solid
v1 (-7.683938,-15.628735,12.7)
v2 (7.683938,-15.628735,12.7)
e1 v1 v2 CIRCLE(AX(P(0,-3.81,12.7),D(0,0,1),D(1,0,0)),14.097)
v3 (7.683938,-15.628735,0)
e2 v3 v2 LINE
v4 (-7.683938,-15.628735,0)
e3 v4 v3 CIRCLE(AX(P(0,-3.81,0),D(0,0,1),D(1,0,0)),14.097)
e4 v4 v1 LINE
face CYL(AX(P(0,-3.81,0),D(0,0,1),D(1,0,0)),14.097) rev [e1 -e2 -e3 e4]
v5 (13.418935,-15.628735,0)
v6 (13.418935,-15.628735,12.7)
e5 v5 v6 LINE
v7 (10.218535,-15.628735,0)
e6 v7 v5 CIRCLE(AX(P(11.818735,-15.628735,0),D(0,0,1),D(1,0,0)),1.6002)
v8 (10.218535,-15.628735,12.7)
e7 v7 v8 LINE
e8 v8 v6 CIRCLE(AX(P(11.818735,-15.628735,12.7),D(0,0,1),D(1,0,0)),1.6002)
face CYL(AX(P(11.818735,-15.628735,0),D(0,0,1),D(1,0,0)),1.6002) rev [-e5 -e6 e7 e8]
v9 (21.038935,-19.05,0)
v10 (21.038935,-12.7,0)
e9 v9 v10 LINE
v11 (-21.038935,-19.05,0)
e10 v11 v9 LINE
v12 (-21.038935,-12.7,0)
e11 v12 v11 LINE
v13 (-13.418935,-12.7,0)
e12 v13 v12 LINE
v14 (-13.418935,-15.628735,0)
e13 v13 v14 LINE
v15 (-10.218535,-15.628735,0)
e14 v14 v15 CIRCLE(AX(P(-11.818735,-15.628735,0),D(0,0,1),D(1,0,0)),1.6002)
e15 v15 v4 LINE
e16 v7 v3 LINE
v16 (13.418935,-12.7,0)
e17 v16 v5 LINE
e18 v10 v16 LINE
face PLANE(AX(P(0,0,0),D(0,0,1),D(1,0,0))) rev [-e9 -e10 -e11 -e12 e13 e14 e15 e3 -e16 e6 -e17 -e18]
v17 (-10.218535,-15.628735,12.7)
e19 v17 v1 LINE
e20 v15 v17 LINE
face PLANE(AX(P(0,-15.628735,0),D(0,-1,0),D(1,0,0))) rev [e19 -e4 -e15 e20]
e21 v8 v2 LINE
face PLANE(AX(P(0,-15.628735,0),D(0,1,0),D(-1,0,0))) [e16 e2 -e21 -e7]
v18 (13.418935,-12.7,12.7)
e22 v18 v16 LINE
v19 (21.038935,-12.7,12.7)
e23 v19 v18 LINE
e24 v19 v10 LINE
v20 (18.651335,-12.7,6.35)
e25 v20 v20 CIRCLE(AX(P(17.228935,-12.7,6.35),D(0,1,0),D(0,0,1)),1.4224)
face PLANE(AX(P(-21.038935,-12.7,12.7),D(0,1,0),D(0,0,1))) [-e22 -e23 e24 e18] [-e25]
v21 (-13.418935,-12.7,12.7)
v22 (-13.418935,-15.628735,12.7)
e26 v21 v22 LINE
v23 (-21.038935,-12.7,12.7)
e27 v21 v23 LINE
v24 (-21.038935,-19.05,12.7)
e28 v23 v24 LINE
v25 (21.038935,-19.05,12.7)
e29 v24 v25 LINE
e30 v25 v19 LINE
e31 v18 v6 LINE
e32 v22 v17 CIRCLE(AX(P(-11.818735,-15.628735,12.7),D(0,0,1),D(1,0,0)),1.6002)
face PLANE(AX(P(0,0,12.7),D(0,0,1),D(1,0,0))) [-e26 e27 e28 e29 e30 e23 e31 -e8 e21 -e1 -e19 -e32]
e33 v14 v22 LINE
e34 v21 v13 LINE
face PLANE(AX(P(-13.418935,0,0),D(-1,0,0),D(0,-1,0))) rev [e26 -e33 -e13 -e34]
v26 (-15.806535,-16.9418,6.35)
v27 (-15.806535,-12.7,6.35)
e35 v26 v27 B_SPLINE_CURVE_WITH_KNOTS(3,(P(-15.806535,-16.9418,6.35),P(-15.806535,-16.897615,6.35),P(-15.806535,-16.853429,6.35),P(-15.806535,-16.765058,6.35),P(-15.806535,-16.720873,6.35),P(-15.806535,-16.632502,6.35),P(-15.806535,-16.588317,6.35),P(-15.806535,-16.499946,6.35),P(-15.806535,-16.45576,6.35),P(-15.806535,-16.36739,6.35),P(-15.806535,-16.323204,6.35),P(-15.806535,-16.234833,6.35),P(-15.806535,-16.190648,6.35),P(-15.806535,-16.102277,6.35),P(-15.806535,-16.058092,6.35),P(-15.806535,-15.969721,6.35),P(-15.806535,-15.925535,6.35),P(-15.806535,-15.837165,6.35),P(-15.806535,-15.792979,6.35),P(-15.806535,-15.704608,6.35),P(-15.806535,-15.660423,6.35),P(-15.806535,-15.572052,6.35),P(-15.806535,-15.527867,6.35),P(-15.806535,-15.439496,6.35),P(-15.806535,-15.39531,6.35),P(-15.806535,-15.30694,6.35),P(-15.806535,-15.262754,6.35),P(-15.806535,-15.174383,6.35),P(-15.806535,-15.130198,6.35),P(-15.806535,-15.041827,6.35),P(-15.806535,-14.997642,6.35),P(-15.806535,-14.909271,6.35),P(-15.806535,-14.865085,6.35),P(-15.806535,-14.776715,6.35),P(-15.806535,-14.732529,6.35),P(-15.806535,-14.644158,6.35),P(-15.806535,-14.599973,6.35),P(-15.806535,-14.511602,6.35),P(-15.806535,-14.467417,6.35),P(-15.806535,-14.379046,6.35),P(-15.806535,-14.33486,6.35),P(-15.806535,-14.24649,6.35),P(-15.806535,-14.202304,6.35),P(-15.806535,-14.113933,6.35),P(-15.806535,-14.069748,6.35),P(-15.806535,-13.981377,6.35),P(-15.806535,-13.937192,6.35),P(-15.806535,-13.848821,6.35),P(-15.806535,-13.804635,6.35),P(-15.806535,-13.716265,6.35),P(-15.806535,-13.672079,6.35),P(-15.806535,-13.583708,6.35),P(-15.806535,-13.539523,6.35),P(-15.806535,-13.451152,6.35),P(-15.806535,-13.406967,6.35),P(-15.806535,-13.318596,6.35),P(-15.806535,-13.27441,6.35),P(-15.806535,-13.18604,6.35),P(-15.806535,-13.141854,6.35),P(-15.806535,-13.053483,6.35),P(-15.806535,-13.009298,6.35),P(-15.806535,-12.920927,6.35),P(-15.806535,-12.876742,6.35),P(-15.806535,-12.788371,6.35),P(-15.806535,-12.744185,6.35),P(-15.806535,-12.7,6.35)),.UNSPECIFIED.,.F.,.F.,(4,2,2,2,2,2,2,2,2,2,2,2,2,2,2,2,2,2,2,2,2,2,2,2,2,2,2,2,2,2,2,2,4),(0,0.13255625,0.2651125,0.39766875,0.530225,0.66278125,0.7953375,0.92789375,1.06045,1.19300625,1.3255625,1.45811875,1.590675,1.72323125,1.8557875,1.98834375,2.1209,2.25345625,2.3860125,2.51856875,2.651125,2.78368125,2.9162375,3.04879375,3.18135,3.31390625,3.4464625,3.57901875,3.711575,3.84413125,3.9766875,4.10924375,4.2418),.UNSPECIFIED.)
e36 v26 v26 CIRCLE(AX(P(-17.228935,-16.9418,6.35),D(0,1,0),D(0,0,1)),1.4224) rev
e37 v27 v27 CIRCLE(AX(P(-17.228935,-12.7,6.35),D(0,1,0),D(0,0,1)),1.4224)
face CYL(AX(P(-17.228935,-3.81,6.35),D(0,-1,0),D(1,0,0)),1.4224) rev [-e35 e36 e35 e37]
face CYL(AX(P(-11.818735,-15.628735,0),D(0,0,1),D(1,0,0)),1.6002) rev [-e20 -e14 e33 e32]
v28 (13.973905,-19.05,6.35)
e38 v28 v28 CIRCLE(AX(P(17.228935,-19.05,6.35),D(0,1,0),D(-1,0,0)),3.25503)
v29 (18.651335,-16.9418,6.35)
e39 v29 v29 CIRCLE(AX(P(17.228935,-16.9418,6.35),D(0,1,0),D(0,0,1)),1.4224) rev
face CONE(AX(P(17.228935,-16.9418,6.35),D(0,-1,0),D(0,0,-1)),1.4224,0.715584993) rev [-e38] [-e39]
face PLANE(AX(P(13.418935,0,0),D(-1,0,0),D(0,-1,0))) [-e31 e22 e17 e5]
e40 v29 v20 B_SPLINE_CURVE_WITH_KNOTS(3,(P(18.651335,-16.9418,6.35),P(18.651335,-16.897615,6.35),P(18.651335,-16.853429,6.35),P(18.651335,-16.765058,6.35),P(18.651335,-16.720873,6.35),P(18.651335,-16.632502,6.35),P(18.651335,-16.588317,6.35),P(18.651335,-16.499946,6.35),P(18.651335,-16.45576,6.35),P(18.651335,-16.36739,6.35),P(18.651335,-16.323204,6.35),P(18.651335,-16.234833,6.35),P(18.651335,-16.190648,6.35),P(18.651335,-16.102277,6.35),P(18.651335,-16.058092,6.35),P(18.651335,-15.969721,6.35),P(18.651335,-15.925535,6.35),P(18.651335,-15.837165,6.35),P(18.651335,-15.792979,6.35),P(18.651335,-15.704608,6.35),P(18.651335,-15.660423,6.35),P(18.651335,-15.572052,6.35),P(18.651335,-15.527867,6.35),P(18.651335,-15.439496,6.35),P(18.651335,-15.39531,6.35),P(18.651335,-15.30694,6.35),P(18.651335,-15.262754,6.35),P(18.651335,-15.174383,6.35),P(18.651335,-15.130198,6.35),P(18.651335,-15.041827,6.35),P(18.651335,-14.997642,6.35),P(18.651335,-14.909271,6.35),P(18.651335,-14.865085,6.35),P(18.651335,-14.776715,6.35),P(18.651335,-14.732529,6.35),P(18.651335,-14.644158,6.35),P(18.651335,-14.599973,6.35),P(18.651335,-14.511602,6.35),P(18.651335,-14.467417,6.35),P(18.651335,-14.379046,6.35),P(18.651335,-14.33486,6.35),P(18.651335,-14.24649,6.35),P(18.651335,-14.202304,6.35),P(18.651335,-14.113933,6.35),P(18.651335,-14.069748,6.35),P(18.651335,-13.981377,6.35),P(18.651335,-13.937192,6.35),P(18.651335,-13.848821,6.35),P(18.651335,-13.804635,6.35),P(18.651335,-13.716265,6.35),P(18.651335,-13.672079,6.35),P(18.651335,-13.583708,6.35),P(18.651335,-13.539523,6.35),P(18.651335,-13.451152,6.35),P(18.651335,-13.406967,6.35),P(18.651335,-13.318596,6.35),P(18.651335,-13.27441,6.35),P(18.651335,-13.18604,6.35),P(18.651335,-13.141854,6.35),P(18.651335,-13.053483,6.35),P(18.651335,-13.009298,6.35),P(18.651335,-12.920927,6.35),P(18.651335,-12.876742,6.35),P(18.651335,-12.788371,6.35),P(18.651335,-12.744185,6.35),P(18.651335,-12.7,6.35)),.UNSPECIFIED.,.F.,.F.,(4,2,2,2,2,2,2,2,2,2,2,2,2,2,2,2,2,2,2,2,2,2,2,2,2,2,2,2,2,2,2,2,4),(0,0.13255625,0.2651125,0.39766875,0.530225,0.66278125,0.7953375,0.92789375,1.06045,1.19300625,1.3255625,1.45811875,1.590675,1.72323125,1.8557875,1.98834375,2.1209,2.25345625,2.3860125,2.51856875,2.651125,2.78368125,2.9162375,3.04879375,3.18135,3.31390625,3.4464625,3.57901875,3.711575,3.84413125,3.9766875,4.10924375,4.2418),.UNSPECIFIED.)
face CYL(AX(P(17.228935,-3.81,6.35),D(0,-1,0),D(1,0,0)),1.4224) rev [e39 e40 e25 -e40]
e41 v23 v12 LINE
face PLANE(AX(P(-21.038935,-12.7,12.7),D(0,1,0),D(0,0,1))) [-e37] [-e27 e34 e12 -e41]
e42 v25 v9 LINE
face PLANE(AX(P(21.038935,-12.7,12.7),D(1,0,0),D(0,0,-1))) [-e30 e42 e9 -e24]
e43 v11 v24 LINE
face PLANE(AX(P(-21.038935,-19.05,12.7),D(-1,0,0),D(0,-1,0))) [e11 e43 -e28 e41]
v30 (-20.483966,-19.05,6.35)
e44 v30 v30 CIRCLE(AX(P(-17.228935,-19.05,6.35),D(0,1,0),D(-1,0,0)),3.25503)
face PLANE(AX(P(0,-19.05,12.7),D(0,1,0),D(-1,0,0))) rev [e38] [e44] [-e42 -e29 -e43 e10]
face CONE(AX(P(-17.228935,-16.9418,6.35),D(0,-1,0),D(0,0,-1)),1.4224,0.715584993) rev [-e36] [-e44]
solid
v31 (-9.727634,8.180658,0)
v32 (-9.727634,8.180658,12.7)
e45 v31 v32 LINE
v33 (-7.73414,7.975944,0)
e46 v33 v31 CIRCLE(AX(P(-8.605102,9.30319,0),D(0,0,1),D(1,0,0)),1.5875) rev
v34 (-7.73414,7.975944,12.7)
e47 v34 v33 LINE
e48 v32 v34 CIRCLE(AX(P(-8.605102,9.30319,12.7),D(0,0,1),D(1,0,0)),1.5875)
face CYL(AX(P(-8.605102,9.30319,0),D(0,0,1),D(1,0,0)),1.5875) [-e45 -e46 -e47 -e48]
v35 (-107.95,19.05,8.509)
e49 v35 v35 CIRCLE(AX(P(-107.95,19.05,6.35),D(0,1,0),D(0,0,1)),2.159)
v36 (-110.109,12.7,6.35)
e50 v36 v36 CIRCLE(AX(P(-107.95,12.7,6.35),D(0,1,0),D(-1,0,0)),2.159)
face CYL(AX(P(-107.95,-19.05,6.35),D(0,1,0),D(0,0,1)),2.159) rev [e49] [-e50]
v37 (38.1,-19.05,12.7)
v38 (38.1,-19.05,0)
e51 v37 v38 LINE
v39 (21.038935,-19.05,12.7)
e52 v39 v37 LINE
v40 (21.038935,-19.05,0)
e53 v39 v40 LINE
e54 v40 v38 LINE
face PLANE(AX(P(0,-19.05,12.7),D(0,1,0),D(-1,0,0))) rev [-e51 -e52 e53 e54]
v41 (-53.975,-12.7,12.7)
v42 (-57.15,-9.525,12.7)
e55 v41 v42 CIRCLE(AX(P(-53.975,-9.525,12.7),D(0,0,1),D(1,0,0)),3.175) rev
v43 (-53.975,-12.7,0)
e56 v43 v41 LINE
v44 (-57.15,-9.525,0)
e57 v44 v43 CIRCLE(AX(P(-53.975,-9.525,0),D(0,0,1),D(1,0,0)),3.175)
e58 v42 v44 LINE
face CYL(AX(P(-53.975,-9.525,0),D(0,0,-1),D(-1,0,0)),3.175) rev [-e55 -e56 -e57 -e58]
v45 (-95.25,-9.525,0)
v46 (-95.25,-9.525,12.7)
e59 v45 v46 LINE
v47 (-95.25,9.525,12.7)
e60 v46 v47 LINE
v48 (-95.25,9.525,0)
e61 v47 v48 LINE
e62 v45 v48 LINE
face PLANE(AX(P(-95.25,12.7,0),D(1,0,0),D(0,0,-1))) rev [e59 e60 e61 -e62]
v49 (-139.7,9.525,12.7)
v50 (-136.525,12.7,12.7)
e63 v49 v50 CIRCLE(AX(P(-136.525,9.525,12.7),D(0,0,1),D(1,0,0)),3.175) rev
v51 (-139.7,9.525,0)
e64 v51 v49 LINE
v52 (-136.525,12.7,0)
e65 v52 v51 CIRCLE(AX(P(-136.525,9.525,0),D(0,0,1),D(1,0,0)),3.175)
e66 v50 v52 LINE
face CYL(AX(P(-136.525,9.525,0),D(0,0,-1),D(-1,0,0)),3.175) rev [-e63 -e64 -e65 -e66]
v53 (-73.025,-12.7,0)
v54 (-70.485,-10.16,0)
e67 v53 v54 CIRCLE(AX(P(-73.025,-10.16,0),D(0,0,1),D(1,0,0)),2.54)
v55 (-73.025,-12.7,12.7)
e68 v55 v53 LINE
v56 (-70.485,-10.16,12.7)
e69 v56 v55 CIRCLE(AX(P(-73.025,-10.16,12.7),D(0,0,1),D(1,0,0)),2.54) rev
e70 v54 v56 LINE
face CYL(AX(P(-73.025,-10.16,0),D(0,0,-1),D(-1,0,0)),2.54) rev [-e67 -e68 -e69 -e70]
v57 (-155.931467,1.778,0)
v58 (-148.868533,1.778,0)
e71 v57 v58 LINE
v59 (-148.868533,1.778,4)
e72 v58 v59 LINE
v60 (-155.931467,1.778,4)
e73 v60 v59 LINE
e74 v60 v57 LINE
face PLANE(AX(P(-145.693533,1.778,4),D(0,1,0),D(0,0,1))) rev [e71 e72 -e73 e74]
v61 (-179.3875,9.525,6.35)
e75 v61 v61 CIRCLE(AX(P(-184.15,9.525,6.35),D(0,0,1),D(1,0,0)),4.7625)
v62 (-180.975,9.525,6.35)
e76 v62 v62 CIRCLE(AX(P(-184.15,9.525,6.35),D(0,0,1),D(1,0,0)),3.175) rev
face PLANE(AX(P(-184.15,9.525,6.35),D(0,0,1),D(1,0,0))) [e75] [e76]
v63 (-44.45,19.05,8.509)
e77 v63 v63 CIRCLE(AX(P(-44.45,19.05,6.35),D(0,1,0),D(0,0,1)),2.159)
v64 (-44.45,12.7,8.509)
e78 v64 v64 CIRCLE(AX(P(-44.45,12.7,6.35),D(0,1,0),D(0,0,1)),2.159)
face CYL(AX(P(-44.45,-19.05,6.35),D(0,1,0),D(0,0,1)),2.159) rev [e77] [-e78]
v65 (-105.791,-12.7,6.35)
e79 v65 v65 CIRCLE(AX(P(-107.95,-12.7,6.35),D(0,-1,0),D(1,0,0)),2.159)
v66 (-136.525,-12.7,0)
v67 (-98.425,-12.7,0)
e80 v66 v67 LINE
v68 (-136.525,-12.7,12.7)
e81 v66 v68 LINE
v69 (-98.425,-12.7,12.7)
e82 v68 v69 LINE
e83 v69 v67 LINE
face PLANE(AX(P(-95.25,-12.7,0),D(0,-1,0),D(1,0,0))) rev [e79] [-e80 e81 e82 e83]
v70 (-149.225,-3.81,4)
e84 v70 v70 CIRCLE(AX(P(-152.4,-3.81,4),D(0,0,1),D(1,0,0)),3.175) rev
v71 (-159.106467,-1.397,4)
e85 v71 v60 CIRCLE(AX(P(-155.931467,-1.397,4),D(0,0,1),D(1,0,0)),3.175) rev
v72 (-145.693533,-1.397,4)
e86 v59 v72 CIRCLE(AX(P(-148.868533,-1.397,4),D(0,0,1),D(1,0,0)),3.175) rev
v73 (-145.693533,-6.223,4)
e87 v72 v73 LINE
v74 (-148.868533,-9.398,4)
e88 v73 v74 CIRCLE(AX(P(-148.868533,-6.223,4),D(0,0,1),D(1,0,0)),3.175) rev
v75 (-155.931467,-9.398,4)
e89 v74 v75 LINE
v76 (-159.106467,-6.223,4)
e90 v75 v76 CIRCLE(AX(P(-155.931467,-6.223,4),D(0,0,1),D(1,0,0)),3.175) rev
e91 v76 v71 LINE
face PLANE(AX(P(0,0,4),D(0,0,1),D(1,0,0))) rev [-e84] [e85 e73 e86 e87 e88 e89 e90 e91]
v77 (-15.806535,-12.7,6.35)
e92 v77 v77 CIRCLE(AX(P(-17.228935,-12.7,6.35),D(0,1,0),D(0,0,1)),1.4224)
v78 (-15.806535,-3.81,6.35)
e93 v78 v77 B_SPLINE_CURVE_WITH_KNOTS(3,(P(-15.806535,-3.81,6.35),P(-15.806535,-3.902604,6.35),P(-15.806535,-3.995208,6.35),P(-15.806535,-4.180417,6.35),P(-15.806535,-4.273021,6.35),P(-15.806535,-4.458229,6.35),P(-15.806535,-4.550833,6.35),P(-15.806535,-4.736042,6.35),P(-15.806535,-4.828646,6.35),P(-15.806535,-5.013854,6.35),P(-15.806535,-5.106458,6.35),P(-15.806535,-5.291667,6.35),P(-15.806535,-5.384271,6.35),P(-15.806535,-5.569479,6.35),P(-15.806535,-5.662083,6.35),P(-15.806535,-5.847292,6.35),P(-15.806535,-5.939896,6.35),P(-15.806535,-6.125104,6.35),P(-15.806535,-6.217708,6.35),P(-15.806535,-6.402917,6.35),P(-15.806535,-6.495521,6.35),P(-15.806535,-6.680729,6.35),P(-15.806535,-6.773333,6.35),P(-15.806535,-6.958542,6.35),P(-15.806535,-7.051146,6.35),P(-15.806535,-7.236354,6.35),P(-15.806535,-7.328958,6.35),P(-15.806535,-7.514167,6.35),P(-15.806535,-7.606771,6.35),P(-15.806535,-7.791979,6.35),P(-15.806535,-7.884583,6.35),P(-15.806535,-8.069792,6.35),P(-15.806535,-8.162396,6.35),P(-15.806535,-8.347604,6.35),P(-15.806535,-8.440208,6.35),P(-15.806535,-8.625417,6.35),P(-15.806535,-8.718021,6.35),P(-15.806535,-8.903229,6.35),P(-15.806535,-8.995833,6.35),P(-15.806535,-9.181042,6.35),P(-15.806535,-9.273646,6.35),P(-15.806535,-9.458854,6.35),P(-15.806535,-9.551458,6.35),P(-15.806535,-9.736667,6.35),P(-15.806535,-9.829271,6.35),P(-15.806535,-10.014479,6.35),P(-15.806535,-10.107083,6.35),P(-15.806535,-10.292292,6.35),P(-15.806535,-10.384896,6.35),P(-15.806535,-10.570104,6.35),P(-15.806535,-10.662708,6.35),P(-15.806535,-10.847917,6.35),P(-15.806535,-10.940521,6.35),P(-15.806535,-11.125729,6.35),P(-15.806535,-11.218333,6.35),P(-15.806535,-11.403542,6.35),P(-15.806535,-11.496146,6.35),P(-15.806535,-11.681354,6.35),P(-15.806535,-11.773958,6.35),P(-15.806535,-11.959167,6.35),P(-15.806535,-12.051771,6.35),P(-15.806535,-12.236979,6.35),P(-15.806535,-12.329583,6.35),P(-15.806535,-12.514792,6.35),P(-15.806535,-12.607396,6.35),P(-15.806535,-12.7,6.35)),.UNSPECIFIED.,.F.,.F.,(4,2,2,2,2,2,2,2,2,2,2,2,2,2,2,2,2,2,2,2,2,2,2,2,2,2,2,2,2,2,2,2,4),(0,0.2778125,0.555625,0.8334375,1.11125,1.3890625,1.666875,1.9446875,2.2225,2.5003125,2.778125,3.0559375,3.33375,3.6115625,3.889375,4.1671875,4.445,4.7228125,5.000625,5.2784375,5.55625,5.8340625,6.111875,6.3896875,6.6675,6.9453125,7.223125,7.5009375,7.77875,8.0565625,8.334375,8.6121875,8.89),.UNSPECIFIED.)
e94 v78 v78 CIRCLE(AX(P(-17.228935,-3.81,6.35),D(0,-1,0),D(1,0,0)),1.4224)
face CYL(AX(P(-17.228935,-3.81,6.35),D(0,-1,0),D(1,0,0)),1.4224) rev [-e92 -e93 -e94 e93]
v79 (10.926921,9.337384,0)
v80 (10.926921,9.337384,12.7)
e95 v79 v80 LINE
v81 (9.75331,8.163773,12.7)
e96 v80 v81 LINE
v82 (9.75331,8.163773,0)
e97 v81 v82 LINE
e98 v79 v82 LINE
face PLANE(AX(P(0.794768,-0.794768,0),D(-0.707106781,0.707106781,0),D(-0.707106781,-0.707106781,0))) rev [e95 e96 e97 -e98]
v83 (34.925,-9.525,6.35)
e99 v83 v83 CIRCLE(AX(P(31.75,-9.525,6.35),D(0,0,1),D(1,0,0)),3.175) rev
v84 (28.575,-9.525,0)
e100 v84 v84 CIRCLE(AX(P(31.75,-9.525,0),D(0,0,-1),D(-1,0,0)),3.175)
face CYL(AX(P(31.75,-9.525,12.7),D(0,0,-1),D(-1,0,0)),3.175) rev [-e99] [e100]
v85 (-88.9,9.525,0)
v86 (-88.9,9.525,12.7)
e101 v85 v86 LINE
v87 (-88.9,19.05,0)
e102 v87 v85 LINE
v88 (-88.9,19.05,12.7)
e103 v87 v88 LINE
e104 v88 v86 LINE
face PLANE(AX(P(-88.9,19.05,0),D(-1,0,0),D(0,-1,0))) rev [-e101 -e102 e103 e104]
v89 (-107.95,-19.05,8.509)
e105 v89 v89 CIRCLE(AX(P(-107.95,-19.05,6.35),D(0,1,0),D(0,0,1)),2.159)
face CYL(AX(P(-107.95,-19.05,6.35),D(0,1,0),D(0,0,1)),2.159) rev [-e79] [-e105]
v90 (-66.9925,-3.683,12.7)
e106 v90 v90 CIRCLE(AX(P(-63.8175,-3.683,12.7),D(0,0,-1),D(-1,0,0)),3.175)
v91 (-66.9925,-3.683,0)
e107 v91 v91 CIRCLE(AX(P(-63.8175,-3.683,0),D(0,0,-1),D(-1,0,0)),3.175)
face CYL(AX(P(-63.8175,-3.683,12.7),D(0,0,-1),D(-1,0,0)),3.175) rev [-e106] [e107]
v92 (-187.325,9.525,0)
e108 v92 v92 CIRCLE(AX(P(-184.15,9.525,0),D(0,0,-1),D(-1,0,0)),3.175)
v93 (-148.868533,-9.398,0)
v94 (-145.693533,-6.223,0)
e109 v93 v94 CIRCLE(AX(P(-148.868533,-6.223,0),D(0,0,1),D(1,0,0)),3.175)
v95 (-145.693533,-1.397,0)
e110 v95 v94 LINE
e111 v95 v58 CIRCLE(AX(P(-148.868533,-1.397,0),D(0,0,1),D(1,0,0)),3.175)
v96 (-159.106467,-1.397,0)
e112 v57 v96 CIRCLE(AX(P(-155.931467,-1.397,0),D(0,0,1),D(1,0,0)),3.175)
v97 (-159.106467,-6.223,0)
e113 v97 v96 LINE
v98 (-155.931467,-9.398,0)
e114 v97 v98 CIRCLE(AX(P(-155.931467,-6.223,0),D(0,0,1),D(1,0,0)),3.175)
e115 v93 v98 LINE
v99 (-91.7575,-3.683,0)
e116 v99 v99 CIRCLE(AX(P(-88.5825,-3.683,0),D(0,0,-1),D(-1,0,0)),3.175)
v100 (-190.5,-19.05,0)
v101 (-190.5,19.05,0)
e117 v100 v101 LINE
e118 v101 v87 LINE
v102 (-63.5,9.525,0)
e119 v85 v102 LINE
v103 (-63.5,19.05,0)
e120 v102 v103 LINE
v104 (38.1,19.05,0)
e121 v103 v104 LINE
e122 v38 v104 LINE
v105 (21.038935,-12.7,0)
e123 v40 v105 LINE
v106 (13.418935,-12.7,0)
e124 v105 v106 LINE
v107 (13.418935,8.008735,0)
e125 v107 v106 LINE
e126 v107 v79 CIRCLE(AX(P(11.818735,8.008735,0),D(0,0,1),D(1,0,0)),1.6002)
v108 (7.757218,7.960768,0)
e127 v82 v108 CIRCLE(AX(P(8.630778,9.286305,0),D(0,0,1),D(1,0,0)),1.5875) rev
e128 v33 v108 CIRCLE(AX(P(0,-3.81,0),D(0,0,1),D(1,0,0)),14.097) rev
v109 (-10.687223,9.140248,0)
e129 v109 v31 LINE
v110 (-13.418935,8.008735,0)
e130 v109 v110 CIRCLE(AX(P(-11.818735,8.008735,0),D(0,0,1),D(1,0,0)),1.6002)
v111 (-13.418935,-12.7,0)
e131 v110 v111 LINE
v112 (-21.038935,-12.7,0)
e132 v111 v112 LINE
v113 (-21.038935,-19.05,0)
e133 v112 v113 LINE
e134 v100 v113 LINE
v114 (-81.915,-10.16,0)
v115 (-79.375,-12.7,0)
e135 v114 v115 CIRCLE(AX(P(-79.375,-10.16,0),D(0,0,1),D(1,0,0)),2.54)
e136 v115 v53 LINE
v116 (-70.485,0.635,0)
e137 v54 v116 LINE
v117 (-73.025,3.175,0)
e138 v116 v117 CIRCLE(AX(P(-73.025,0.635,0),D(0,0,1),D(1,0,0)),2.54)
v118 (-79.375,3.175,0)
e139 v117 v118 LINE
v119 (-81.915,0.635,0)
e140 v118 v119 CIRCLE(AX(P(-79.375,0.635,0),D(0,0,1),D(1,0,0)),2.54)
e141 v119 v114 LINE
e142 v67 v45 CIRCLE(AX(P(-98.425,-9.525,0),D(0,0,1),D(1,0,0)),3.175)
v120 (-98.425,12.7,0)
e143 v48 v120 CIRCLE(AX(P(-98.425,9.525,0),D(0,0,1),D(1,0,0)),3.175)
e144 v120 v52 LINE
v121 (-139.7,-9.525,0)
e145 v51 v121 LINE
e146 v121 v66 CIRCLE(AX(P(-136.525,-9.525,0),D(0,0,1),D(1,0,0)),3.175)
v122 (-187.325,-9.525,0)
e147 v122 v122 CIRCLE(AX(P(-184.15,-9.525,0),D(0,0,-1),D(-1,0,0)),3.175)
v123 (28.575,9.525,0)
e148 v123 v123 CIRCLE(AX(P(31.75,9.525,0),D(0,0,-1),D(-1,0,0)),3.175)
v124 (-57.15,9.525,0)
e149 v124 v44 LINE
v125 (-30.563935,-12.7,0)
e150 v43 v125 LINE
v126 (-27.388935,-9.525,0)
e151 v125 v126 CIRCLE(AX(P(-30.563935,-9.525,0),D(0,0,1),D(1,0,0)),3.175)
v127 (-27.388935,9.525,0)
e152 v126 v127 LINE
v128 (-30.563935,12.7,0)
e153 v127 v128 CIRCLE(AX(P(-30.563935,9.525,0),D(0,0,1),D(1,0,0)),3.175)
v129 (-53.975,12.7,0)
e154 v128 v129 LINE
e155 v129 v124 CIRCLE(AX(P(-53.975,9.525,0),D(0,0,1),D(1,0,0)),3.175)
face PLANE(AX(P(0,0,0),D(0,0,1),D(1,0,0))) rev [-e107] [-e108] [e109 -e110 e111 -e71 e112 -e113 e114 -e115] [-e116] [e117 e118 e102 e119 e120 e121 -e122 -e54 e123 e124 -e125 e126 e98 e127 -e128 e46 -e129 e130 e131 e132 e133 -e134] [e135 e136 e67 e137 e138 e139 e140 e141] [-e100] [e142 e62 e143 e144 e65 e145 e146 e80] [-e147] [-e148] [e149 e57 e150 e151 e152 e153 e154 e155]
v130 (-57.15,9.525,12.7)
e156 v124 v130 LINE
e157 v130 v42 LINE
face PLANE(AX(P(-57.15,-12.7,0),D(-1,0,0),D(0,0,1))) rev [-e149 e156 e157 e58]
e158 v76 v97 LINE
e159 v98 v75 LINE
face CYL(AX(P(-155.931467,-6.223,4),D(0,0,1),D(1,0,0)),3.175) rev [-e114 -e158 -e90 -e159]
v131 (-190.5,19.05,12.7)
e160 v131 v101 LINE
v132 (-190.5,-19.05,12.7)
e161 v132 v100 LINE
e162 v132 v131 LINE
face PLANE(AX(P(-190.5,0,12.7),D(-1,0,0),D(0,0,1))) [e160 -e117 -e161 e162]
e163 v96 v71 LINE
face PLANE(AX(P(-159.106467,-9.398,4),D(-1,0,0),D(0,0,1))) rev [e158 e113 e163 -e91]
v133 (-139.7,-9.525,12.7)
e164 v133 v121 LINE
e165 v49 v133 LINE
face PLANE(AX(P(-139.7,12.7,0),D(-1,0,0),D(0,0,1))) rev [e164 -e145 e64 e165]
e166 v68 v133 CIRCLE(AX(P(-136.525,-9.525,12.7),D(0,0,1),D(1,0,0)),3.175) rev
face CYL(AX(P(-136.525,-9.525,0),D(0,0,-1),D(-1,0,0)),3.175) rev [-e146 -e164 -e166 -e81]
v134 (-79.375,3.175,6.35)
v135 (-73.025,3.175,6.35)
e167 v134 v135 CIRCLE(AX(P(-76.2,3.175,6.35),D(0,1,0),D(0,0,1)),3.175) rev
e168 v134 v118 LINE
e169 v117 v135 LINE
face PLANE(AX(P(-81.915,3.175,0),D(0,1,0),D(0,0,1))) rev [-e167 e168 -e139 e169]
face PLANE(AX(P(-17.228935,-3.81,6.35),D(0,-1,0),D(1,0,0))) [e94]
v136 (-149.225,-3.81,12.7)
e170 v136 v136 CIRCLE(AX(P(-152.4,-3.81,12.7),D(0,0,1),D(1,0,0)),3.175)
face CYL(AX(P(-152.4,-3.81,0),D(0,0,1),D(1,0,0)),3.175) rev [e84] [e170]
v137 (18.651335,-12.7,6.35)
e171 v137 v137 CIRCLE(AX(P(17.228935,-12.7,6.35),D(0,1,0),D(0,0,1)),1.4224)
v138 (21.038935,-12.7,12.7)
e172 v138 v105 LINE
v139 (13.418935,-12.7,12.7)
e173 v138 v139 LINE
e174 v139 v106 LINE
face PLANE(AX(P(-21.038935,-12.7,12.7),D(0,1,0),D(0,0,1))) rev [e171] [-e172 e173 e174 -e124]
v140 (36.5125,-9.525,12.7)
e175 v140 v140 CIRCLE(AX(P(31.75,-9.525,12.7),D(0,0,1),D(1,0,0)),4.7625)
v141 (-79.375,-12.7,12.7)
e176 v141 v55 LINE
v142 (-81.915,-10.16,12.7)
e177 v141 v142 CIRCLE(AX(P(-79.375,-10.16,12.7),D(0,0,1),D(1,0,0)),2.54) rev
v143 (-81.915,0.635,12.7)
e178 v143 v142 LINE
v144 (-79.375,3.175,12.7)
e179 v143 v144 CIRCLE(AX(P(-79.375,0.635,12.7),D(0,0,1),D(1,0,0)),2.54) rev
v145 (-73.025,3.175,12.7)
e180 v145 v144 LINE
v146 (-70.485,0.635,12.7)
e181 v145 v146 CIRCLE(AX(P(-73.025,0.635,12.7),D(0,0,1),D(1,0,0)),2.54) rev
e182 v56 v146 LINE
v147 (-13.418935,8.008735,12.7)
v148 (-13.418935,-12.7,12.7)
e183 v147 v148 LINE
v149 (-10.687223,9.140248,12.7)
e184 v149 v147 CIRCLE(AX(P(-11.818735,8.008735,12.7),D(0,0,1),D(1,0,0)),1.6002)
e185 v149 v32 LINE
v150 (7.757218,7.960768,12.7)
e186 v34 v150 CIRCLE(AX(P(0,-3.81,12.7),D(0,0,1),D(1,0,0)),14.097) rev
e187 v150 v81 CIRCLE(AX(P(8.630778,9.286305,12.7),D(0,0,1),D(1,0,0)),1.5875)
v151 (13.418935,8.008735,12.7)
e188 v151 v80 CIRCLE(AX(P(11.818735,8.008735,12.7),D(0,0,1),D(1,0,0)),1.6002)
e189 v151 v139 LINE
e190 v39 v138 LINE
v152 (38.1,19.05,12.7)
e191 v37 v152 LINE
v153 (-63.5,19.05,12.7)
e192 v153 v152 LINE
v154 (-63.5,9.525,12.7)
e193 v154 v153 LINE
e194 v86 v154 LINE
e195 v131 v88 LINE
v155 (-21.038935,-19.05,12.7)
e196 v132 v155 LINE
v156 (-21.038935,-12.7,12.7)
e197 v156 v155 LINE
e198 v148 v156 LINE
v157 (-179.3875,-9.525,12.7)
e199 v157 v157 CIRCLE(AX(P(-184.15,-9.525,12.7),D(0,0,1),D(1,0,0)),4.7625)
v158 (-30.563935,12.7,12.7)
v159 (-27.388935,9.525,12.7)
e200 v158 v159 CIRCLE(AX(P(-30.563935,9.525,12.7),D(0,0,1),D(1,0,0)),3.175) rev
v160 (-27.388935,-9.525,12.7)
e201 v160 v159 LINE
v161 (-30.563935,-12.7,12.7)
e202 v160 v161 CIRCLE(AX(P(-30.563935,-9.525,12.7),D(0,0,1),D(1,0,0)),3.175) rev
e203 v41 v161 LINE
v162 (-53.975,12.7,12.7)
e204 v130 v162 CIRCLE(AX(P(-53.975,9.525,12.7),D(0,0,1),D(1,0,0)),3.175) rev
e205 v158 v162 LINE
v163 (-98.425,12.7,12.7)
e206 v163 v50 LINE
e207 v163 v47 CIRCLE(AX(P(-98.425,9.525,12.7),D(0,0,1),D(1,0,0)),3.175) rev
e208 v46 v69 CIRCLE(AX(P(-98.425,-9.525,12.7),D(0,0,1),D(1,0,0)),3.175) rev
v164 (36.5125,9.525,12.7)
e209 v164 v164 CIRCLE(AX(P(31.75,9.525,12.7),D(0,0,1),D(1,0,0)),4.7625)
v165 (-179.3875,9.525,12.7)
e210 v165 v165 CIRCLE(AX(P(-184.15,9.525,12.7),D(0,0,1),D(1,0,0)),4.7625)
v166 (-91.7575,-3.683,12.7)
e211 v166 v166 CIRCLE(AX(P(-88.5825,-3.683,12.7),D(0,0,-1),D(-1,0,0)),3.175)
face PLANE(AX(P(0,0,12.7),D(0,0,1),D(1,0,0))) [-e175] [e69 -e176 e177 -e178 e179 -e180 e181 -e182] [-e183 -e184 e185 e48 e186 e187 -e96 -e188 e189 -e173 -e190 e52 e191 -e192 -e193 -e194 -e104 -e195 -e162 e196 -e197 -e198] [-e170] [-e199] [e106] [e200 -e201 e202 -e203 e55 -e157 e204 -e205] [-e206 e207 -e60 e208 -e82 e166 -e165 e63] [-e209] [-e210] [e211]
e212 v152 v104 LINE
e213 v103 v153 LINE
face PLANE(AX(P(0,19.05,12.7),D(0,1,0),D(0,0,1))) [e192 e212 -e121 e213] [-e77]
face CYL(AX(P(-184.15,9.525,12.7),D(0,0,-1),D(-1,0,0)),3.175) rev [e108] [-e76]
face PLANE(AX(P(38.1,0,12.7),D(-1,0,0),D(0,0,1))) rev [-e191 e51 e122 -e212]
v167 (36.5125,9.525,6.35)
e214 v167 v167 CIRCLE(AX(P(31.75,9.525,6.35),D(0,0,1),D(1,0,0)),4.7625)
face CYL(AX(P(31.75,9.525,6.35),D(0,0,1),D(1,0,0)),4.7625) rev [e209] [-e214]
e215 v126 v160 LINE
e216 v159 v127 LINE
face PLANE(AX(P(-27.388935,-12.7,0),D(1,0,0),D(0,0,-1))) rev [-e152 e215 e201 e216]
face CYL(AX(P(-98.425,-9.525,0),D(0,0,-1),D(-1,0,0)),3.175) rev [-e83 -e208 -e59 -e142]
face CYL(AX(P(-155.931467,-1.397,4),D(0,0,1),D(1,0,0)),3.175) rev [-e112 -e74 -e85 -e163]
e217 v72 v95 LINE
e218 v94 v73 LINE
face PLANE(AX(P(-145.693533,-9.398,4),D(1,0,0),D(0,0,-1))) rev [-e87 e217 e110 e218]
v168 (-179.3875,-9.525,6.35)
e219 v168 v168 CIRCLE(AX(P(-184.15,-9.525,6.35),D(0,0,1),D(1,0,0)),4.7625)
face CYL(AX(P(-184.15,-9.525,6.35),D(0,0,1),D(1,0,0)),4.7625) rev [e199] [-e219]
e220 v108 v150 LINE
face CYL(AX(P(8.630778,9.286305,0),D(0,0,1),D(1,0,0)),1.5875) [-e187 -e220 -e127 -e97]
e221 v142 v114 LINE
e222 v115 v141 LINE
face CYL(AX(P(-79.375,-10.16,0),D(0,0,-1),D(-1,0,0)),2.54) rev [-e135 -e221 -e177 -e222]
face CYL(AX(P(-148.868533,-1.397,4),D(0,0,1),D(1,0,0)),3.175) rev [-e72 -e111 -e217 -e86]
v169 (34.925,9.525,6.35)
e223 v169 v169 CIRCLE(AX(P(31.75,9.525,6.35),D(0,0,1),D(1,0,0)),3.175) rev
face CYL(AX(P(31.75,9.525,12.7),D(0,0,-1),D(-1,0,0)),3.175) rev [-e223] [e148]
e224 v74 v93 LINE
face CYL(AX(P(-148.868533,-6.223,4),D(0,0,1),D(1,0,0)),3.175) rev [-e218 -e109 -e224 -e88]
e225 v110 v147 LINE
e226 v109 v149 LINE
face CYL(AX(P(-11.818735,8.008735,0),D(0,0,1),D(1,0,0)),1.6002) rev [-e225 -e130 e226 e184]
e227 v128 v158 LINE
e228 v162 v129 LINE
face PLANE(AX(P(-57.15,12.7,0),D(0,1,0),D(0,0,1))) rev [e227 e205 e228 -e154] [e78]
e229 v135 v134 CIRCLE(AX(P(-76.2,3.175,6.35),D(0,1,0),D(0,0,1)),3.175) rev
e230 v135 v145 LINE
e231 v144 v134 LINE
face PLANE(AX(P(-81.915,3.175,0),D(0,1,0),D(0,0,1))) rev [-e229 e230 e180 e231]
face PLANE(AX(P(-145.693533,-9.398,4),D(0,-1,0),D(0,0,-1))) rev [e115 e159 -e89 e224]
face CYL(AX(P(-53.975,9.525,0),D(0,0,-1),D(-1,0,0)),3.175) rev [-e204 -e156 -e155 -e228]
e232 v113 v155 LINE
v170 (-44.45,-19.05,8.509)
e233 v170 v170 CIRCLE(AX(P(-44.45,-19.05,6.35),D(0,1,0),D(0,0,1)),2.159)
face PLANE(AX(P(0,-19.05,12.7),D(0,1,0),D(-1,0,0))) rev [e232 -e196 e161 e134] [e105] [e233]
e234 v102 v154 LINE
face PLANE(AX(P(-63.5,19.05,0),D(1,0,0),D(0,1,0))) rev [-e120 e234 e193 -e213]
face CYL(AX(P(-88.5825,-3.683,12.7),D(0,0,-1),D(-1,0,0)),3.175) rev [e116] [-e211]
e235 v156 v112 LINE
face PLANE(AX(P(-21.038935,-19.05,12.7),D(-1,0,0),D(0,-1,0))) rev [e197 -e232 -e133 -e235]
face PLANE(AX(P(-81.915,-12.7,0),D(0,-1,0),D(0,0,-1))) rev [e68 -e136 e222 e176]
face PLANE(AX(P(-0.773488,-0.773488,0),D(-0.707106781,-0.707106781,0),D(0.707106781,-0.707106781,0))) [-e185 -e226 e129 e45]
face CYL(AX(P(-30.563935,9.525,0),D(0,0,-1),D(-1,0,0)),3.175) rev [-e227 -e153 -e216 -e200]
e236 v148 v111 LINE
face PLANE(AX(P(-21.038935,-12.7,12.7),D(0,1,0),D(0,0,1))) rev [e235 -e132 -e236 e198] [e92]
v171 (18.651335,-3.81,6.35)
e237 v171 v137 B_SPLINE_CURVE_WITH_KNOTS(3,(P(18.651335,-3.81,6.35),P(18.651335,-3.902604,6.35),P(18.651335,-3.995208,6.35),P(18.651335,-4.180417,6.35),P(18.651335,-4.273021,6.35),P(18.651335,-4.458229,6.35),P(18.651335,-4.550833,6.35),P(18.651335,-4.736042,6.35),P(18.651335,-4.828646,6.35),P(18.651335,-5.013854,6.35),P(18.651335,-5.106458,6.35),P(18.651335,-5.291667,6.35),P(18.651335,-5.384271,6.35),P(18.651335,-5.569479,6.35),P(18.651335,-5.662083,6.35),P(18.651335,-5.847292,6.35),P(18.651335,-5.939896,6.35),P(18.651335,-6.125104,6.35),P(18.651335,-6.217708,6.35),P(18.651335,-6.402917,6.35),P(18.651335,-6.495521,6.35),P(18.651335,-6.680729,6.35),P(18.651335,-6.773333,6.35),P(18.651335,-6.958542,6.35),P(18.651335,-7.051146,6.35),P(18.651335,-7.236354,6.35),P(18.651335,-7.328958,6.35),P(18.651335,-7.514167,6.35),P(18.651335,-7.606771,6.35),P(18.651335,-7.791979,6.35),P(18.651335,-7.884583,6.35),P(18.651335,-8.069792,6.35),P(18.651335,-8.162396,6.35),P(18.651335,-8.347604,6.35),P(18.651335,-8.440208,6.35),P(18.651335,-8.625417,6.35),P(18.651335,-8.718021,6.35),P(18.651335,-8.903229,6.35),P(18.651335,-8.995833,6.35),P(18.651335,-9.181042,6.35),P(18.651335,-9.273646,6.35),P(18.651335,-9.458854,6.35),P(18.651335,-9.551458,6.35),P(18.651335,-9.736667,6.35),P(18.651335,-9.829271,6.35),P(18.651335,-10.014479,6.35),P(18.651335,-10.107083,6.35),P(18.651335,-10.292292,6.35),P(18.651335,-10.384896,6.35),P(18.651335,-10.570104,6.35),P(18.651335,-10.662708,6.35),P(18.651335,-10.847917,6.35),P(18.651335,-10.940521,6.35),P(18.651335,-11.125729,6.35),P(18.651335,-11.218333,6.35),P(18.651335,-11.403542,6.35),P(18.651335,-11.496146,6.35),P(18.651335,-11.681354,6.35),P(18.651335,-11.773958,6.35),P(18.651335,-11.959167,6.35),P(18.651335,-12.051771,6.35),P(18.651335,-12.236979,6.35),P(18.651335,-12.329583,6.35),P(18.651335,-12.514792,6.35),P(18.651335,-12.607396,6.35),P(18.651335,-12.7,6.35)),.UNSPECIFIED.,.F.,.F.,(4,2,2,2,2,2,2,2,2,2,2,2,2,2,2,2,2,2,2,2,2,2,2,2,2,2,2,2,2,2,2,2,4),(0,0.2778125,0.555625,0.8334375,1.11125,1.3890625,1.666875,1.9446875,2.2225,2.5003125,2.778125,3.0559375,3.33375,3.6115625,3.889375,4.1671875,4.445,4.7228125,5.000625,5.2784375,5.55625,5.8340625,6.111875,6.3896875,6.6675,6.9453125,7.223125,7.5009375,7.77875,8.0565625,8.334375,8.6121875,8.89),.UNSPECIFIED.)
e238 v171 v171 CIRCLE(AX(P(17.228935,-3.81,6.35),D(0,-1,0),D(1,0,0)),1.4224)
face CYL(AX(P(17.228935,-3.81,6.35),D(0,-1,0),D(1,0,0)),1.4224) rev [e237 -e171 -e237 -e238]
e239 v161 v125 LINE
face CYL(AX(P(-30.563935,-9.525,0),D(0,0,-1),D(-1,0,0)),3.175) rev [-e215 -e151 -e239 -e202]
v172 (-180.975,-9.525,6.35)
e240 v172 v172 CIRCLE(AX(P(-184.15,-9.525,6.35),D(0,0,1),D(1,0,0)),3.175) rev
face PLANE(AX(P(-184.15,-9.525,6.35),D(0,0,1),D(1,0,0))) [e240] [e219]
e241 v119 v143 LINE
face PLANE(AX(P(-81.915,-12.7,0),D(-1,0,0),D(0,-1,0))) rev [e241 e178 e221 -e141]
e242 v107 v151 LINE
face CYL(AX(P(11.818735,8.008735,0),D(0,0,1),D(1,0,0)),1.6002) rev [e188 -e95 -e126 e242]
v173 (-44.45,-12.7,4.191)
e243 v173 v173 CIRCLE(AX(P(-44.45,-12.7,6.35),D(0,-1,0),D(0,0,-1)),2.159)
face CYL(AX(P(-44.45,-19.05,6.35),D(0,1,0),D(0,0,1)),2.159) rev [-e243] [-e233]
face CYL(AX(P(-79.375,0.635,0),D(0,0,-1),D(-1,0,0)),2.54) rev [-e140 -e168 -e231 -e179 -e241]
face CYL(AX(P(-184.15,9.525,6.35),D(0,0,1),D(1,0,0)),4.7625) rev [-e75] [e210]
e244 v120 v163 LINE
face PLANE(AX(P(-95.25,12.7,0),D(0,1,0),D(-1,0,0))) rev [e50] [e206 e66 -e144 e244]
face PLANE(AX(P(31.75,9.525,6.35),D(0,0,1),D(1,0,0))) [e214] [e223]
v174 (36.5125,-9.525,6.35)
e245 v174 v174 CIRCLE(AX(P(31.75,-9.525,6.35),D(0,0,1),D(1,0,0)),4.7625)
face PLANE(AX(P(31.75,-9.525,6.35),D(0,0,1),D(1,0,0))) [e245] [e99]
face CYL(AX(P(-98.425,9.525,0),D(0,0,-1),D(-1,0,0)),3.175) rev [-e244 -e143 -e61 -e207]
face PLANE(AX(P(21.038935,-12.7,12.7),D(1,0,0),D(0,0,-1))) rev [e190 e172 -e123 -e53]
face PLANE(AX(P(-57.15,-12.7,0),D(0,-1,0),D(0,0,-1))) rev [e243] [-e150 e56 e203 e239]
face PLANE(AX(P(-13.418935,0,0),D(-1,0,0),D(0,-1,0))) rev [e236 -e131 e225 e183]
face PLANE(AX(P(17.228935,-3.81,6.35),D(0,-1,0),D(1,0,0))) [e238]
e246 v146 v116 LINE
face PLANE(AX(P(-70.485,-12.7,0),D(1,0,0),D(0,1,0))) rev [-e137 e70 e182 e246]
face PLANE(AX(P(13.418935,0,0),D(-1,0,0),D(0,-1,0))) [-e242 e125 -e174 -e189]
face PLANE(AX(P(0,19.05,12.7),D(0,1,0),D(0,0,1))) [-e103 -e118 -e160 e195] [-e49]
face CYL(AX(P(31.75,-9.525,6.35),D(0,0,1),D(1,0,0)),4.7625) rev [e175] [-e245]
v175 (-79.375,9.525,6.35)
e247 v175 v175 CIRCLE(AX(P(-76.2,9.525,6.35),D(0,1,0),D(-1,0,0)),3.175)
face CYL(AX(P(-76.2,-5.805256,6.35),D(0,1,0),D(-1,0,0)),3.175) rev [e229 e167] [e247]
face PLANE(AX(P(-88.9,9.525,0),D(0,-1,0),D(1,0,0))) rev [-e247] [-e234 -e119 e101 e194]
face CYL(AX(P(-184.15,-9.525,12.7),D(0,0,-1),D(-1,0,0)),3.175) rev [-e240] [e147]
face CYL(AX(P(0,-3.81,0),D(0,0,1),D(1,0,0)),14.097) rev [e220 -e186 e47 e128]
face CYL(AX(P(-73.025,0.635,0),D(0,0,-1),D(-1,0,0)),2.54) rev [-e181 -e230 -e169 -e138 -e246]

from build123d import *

# Parameters (mm, degrees)
SKETCH1_W                = 228.6
SKETCH1_H                = 38.1
BOSS_EXTRUDE1_DEPTH      = 12.7
CUT_EXTRUDE4_DEPTH       = 192.870900608
FILLET1_R                = 1.5875
SKETCH6_W                = 25.4
SKETCH6_H                = 9.525
CUT_EXTRUDE5_DEPTH       = 192.870900608
SKETCH7_W                = 11.43
SKETCH7_H                = 15.875
CUT_EXTRUDE6_DEPTH       = 192.870900608
SKETCH8_R                = 3.175
CUT_EXTRUDE7_DEPTH       = 6.35
SKETCH9_R                = 3.175
CUT_EXTRUDE8_DEPTH       = 192.870900608
SKETCH10_R               = 4.7625
CUT_EXTRUDE9_DEPTH       = 6.35
FILLET2_R                = 2.54
SURFACE_EXTRUDE1_1_BACK  = 12.7
SURFACE_EXTRUDE1_1_DEPTH = 12.7
SURFACE_EXTRUDE1_2_BACK  = 12.7
SURFACE_EXTRUDE1_2_DEPTH = 12.7
SKETCH12_R               = 1.4224
CUT_EXTRUDE10_DEPTH      = 15.24
CHAMFER1_SIZE            = 2.1082
CHAMFER1_SIZE2           = 1.832630301
CHAMFER2_SIZE            = 2.1082
CHAMFER2_SIZE2           = 1.832630301
SKETCH13_W               = 29.761064524
SKETCH13_H               = 25.4
SKETCH13_W_2             = 44.45
CUT_EXTRUDE11_DEPTH      = 192.870900608
FILLET3_R                = 3.175
SKETCH14_R               = 3.175
CUT_EXTRUDE12_DEPTH      = 192.870900608
SKETCH15_W               = 13.412933216
SKETCH15_H               = 11.176
CUT_EXTRUDE13_DEPTH      = 4
FILLET4_R                = 3.175
SKETCH16_R               = 3.175
CUT_EXTRUDE14_DEPTH      = 192.870900608
SKETCH17_R               = 2.159
CUT_EXTRUDE15_DEPTH      = 195.687313403


with BuildPart() as part:
    # Sketch1 → Boss-Extrude1 (new body)
    with BuildSketch(Plane.XY):
        with Locations((-76.2, 0)):
            Rectangle(SKETCH1_W, SKETCH1_H)
    extrude(amount=BOSS_EXTRUDE1_DEPTH)

    # Sketch5 → Cut-Extrude4 (cut, through all)
    with BuildSketch(Plane.XY.offset(12.7)):
        with BuildLine():
            Line((-8.772142836, 7.225167378), (-10.687223205, 9.140247747))
            ThreePointArc((-10.687223205, 9.140247747), (-12.431105504, 9.487127504), (-13.418935476, 8.008735476))
            Line((-13.418935476, 8.008735476), (-13.418935476, -15.628735476))
            ThreePointArc((-13.418935476, -15.628735476), (-11.818735476, -17.228935476), (-10.218535476, -15.628735476))
            Line((-10.218535476, -15.628735476), (-7.683937842, -15.628735476))
            ThreePointArc((-7.683937842, -15.628735476), (0, -17.907), (7.683937842, -15.628735476))
            Line((7.683937842, -15.628735476), (10.218535476, -15.628735476))
            ThreePointArc((10.218535476, -15.628735476), (11.818735476, -17.228935476), (13.418935476, -15.628735476))
            Line((13.418935476, -15.628735476), (13.418935476, 8.008735476))
            ThreePointArc((13.418935476, 8.008735476), (12.571582801, 9.420776887), (10.926920796, 9.337383893))
            Line((10.926920796, 9.337383893), (8.795831767, 7.206294864))
            ThreePointArc((8.795831767, 7.206294864), (0.015143788, 10.286991866), (-8.772142836, 7.225167378))
        make_face()
    extrude(amount=-CUT_EXTRUDE4_DEPTH, mode=Mode.SUBTRACT)

    # Fillet1
    fillet1_edges = [part.edges().sort_by_distance(p)[0] for p in [
        (-8.772142836, 7.225167378, 6.35),
        (8.795831767, 7.206294864, 6.35),
    ]]
    fillet(fillet1_edges, radius=FILLET1_R)

    # Sketch6 → Cut-Extrude5 (cut, through all)
    with BuildSketch(Plane.XY.offset(12.7)):
        with Locations((-76.2, 14.2875)):
            Rectangle(SKETCH6_W, SKETCH6_H)
    extrude(amount=-CUT_EXTRUDE5_DEPTH, mode=Mode.SUBTRACT)

    # Sketch7 → Cut-Extrude6 (cut, through all)
    with BuildSketch(Plane.XY.offset(12.7)):
        with Locations((-76.2, -4.7625)):
            Rectangle(SKETCH7_W, SKETCH7_H)
    extrude(amount=-CUT_EXTRUDE6_DEPTH, mode=Mode.SUBTRACT)

    # Sketch8 → Cut-Extrude7 (cut)
    with BuildSketch(Plane(origin=(0, 9.525, 0), x_dir=(1, 0, 0), z_dir=(0, 1, 0))):
        with Locations(Location((-76.2, -6.35, 0), (0, 0, 180))):
            Circle(SKETCH8_R)
    extrude(amount=-CUT_EXTRUDE7_DEPTH, mode=Mode.SUBTRACT)

    # Sketch9 → Cut-Extrude8 (cut, through all)
    with BuildSketch(Plane(origin=(0, 0, 0), x_dir=(-1, 0, 0), z_dir=(0, 0, -1))):
        with Locations((-31.75, 9.525)):
            Circle(SKETCH9_R)
        with Locations((-31.75, -9.525)):
            Circle(SKETCH9_R)
        with Locations((184.15, 9.525)):
            Circle(SKETCH9_R)
        with Locations((184.15, -9.525)):
            Circle(SKETCH9_R)
    extrude(amount=-CUT_EXTRUDE8_DEPTH, mode=Mode.SUBTRACT)

    # Sketch10 → Cut-Extrude9 (cut)
    with BuildSketch(Plane.XY.offset(12.7)):
        with Locations((-184.15, 9.525)):
            Circle(SKETCH10_R)
        with Locations((-184.15, -9.525)):
            Circle(SKETCH10_R)
        with Locations((31.75, 9.525)):
            Circle(SKETCH10_R)
        with Locations((31.75, -9.525)):
            Circle(SKETCH10_R)
    extrude(amount=-CUT_EXTRUDE9_DEPTH, mode=Mode.SUBTRACT)

    # Fillet2
    fillet2_edges = [part.edges().sort_by_distance(p)[0] for p in [
        (-70.485, -12.7, 6.35),
        (-81.915, -12.7, 6.35),
        (-81.915, 3.175, 6.35),
        (-70.485, 3.175, 6.35),
    ]]
    fillet(fillet2_edges, radius=FILLET2_R - 0.0001)  # a hair under: the kernel refuses the full size


with BuildPart() as body_2:
    # Split1: the piece behind the surface
    add(part.part)
    # Surface-Extrude1: a surface, the sketch's curves swept straight by 12.7 mm
    with BuildLine(Plane.XY.offset(12.7).offset(-SURFACE_EXTRUDE1_1_BACK), mode=Mode.PRIVATE) as surface_extrude1_1_path:
        Line((-21.038935476, -19.05), (-21.038935476, -12.7))
        Line((-21.038935476, -12.7), (21.038935476, -12.7))
        Line((21.038935476, -12.7), (21.038935476, -19.05))
    surface_extrude1_1 = Shell.extrude(surface_extrude1_1_path.wire(), (0 * SURFACE_EXTRUDE1_1_DEPTH, 0 * SURFACE_EXTRUDE1_1_DEPTH, 1 * SURFACE_EXTRUDE1_1_DEPTH))
    split(bisect_by=surface_extrude1_1, keep=Keep.BOTTOM)


with BuildPart() as part_1:
    add(part.part)

    # Split1: split by a surface, the side it looks to stays
    # Surface-Extrude1: a surface, the sketch's curves swept straight by 12.7 mm
    with BuildLine(Plane.XY.offset(12.7).offset(-SURFACE_EXTRUDE1_2_BACK), mode=Mode.PRIVATE) as surface_extrude1_2_path:
        Line((-21.038935476, -19.05), (-21.038935476, -12.7))
        Line((-21.038935476, -12.7), (21.038935476, -12.7))
        Line((21.038935476, -12.7), (21.038935476, -19.05))
    surface_extrude1_2 = Shell.extrude(surface_extrude1_2_path.wire(), (0 * SURFACE_EXTRUDE1_2_DEPTH, 0 * SURFACE_EXTRUDE1_2_DEPTH, 1 * SURFACE_EXTRUDE1_2_DEPTH))
    split(bisect_by=surface_extrude1_2, keep=Keep.TOP)


with BuildPart() as cut_extrude10_tool:
    # Sketch12 → Cut-Extrude10 (new body)
    with BuildSketch(Plane.XZ.offset(19.05)):
        with Locations((-17.228935476, 6.35)):
            Circle(SKETCH12_R)
        with Locations((17.228935476, 6.35)):
            Circle(SKETCH12_R)
    extrude(amount=-CUT_EXTRUDE10_DEPTH)


with BuildPart() as part_2:
    add(part_1.part)

    # Cut-Extrude10: cut by cut_extrude10_tool
    add(cut_extrude10_tool.part, mode=Mode.SUBTRACT)

    # Sketch13 → Cut-Extrude11 (cut, through all)
    with BuildSketch(Plane.XY.offset(12.7)):
        with Locations((-42.269467738, 0)):
            Rectangle(SKETCH13_W, SKETCH13_H)
        with Locations((-117.475, 0)):
            Rectangle(SKETCH13_W_2, SKETCH13_H)
    extrude(amount=-CUT_EXTRUDE11_DEPTH, mode=Mode.SUBTRACT)

    # Fillet3
    fillet3_edges = [part_2.edges().sort_by_distance(p)[0] for p in [
        (-57.15, -12.7, 6.35),
        (-57.15, 12.7, 6.35),
        (-27.388935476, 12.7, 6.35),
        (-27.388935476, -12.7, 6.35),
        (-95.25, 12.7, 6.35),
        (-95.25, -12.7, 6.35),
        (-139.7, -12.7, 6.35),
        (-139.7, 12.7, 6.35),
    ]]
    fillet(fillet3_edges, radius=FILLET3_R)

    # Sketch14 → Cut-Extrude12 (cut, through all)
    with BuildSketch(Plane.XY.offset(12.7)):
        with Locations((-152.4, -3.81)):
            Circle(SKETCH14_R)
    extrude(amount=-CUT_EXTRUDE12_DEPTH, mode=Mode.SUBTRACT)

    # Sketch15 → Cut-Extrude13 (cut)
    with BuildSketch(Plane(origin=(0, 0, 0), x_dir=(-1, 0, 0), z_dir=(0, 0, -1))):
        with Locations((152.4, -3.81)):
            Rectangle(SKETCH15_W, SKETCH15_H)
    extrude(amount=-CUT_EXTRUDE13_DEPTH, mode=Mode.SUBTRACT)

    # Fillet4
    fillet4_edges = [part_2.edges().sort_by_distance(p)[0] for p in [
        (-159.106466608, 1.778, 2),
        (-159.106466608, -9.398, 2),
        (-145.693533392, -9.398, 2),
        (-145.693533392, 1.778, 2),
    ]]
    fillet(fillet4_edges, radius=FILLET4_R)

    # Sketch16 → Cut-Extrude14 (cut, through all)
    with BuildSketch(Plane(origin=(0, 0, 0), x_dir=(-1, 0, 0), z_dir=(0, 0, -1))):
        with Locations((63.8175, -3.683)):
            Circle(SKETCH16_R)
        with Locations((88.5825, -3.683)):
            Circle(SKETCH16_R)
    extrude(amount=-CUT_EXTRUDE14_DEPTH, mode=Mode.SUBTRACT)

    # Sketch17 → Cut-Extrude15 (cut, through all)
    with BuildSketch(Plane(origin=(0, 19.05, 0), x_dir=(1, 0, 0), z_dir=(0, 1, 0))):
        with Locations(Location((-107.95, -6.35, 0), (0, 0, 270))):
            Circle(SKETCH17_R)
        with Locations(Location((-44.45, -6.35, 0), (0, 0, 270))):
            Circle(SKETCH17_R)
    extrude(amount=-CUT_EXTRUDE15_DEPTH, mode=Mode.SUBTRACT)


with BuildPart() as body_2_1:
    add(body_2.part)

    # Cut-Extrude10: cut by cut_extrude10_tool
    add(cut_extrude10_tool.part, mode=Mode.SUBTRACT)

    # Chamfer1
    chamfer1_edges = [body_2_1.edges().sort_by_distance(p)[0] for p in [
        (15.806535476, -19.05, 6.35),
    ]]
    chamfer1_side = [body_2_1.faces().sort_by_distance(p)[0] for p in [
        (15.806535476, -15.875, 6.35),
    ]]
    chamfer(chamfer1_edges, length=CHAMFER1_SIZE, length2=CHAMFER1_SIZE2, reference=chamfer1_side[0])

    # Chamfer2
    chamfer2_edges = [body_2_1.edges().sort_by_distance(p)[0] for p in [
        (-18.651335476, -19.05, 6.35),
    ]]
    chamfer2_side = [body_2_1.faces().sort_by_distance(p)[0] for p in [
        (-18.651335476, -15.875, 6.35),
    ]]
    chamfer(chamfer2_edges, length=CHAMFER2_SIZE, length2=CHAMFER2_SIZE2, reference=chamfer2_side[0])


solid = Compound([part_2.part, body_2_1.part])
